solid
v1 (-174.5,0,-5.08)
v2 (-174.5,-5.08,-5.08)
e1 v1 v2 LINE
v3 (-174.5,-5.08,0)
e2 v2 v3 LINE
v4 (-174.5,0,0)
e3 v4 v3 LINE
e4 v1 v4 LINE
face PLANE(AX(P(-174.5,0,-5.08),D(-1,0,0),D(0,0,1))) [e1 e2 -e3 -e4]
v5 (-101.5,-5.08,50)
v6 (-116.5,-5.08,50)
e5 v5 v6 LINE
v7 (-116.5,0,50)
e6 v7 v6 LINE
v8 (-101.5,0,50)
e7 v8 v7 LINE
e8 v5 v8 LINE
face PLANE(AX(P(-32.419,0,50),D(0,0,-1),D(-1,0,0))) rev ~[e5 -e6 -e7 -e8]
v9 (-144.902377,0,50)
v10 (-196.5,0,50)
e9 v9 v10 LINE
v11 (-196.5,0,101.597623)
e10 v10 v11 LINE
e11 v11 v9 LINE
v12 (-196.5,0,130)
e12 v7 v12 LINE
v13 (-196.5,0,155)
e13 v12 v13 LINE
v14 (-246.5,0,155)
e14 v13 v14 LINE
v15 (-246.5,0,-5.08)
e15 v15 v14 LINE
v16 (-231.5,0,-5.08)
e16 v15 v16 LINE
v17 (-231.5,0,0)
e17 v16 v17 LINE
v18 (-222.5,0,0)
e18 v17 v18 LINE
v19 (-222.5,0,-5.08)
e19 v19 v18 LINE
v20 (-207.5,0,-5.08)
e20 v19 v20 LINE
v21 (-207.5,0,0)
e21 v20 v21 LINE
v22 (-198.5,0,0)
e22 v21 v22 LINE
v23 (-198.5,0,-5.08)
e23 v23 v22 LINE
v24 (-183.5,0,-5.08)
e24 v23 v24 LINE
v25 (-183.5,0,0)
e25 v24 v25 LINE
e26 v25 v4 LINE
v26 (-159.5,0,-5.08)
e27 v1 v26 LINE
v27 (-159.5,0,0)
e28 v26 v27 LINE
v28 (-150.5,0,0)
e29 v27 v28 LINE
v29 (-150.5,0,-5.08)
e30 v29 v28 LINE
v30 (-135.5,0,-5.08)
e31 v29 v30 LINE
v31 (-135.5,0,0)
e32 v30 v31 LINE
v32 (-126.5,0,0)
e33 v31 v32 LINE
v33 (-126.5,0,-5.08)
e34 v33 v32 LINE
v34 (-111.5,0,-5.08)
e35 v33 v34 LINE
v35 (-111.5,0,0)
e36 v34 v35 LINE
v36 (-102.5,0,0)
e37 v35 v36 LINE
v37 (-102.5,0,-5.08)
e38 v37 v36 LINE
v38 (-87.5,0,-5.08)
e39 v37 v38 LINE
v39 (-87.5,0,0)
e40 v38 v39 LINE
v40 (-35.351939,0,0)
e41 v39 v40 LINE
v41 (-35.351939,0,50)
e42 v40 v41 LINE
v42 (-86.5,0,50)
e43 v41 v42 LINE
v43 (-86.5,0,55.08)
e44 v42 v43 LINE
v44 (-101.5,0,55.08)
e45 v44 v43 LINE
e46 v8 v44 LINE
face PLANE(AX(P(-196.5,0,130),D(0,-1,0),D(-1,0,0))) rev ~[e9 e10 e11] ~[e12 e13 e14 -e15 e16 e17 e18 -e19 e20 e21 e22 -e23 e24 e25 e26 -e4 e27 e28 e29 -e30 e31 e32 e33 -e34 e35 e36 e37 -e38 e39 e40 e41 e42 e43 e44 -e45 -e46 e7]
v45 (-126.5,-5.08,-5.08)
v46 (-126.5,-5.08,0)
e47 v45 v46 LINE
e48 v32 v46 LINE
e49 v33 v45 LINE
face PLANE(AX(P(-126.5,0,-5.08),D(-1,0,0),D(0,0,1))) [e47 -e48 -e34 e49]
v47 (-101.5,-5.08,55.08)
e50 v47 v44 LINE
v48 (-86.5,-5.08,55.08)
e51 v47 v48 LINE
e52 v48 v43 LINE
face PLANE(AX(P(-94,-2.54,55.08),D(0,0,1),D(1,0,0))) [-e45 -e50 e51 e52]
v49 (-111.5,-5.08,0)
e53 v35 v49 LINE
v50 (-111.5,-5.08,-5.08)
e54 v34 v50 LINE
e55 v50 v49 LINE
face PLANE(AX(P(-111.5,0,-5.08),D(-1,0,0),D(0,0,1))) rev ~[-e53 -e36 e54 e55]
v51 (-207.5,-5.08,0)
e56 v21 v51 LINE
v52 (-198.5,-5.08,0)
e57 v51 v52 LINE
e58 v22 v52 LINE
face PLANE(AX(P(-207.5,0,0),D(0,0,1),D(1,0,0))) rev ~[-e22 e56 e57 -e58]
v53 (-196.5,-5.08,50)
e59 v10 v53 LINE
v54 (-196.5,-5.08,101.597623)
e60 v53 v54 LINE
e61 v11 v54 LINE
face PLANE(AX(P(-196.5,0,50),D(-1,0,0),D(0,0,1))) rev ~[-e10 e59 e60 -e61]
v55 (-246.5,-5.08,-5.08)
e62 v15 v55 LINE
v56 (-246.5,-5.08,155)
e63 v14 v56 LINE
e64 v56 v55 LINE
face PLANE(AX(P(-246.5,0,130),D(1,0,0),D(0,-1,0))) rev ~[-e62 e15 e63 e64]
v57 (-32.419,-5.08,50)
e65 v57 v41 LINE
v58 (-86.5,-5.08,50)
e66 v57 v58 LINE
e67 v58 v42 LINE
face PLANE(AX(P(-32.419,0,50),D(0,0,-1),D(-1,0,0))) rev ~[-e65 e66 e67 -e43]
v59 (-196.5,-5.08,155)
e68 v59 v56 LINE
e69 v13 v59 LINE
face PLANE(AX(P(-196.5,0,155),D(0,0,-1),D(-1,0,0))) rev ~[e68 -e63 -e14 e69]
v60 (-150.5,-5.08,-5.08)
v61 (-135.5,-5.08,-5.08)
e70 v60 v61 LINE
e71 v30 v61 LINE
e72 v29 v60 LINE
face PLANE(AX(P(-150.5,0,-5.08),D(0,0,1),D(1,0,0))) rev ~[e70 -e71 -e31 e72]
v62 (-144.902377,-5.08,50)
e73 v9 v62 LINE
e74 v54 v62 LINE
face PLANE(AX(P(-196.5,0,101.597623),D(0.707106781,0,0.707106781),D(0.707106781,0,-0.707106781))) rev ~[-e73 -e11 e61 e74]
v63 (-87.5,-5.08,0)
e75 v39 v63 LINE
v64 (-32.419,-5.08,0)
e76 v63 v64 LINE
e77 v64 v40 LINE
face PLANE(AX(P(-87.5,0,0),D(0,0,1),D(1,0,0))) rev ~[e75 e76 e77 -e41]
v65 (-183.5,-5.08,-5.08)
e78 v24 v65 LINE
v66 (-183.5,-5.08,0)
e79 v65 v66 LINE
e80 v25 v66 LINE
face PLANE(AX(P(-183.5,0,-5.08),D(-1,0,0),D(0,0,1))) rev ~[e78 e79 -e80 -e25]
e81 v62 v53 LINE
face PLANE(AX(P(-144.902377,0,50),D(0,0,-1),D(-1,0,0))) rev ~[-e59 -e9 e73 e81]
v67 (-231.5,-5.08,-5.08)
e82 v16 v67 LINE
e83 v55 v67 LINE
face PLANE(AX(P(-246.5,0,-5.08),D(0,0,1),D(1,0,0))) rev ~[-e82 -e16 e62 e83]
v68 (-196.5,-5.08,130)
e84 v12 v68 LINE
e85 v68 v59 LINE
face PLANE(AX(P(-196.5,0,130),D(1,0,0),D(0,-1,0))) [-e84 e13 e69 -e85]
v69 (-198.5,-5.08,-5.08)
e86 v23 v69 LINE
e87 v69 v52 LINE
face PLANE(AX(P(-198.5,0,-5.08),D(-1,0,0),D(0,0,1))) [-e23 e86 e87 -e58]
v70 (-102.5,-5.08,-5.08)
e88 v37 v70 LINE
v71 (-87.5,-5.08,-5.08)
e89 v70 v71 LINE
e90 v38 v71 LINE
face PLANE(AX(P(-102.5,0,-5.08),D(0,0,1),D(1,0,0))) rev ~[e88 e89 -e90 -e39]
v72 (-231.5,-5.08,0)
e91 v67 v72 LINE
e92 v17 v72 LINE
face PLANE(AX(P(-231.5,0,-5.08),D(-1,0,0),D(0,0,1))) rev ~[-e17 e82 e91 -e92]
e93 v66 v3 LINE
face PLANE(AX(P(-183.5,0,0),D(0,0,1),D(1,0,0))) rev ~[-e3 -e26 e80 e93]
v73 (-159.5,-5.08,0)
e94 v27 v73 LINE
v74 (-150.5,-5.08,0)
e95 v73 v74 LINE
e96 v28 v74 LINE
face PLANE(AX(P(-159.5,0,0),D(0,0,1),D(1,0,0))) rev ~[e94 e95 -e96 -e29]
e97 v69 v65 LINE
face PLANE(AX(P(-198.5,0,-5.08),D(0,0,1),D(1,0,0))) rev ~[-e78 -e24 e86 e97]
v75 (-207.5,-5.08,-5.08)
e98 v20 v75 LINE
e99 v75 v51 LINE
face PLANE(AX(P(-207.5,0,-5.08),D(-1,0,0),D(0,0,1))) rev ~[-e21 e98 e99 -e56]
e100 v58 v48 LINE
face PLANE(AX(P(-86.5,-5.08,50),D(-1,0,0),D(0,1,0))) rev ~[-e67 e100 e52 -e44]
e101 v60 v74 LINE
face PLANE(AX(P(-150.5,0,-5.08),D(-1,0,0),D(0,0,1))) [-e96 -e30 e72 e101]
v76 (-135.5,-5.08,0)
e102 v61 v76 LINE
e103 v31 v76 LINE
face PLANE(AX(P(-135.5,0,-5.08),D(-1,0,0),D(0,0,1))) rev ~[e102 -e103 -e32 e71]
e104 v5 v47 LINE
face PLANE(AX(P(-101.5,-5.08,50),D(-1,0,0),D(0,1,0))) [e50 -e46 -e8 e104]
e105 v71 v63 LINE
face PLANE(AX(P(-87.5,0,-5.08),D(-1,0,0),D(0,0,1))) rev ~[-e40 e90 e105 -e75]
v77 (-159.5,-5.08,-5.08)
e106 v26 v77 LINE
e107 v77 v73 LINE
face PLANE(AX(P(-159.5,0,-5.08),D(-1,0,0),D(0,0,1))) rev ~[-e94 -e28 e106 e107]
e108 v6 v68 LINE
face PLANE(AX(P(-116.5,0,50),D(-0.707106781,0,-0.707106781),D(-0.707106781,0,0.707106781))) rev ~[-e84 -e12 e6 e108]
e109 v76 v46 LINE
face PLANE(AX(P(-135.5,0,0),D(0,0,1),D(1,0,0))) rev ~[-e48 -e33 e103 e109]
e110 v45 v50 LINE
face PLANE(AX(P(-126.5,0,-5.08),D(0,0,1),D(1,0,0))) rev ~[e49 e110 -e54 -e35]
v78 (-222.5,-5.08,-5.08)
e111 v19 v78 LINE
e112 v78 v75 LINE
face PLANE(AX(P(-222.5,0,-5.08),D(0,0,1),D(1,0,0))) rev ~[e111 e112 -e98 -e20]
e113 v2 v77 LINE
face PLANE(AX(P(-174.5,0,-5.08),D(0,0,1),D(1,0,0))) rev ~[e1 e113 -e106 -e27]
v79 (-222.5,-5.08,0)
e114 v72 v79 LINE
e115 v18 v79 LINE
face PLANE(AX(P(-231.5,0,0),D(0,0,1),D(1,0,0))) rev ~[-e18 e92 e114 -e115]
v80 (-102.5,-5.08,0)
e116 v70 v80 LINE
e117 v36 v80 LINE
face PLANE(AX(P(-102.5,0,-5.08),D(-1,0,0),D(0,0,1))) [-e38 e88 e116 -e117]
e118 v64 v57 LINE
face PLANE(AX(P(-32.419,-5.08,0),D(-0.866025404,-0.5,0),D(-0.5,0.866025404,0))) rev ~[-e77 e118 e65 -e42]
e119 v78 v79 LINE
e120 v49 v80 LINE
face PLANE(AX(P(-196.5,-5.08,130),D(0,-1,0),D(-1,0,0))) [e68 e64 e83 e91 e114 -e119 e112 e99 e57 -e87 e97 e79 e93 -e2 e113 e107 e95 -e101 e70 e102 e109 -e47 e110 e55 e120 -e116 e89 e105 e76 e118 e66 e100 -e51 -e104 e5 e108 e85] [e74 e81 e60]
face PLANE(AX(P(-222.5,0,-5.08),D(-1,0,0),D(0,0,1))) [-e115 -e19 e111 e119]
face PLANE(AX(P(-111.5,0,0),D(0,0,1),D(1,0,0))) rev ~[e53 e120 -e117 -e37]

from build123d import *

# Parameters (mm, degrees)
F0_W     = 15
F0_H     = 5.08
F1_DEPTH = 5.08
F2_DEPTH = 25
F4_DEPTH = 58
F5_W     = 15
F5_H     = 5.08
F6_DEPTH = 5.08


# Not quite as in the source:
# - a feature names something its author has since deleted; it is built from what else it names


with BuildPart() as f1:
    # F0 (on Front) → F1 (new body)
    with BuildSketch(Plane.XZ):
        Polygon((-87.5, 0), (-32.419, 0), (-32.419, 50), (-116.5, 50), (-144.9023774395, 50), (-196.5, 50), (-196.5, 101.5976225605), (-196.5, 130), (-246.5, 130), (-246.5, 0), (-231.5, 0), (-222.5, 0), (-207.5, 0), (-198.5, 0), (-183.5, 0), (-174.5, 0), (-159.5, 0), (-150.5, 0), (-135.5, 0), (-126.5, 0), (-111.5, 0), (-102.5, 0), align=None)
        with Locations((-95, -2.54)):
            Rectangle(F0_W, F0_H)
        Polygon((-144.9023774395, 50), (-116.5, 50), (-196.5, 130), (-196.5, 101.5976225605), align=None)
        with Locations((-119, -2.54)):
            Rectangle(F0_W, F0_H)
        with Locations((-143, -2.54)):
            Rectangle(F0_W, F0_H)
        with Locations((-239, -2.54)):
            Rectangle(F0_W, F0_H)
        with Locations((-167, -2.54)):
            Rectangle(F0_W, F0_H)
        with Locations((-215, -2.54)):
            Rectangle(F0_W, F0_H)
        with Locations((-191, -2.54)):
            Rectangle(F0_W, F0_H)
    extrude(amount=F1_DEPTH)

    # F2 (add): a face of the model
    f2_faces = [f1.faces().sort_by_distance(p)[0] for p in [
        (-221.5, -2.54, 130),
    ]]
    extrude(f2_faces, amount=F2_DEPTH)

    # F3 (on face) → F4 (cut)
    with BuildSketch(Plane(origin=(0, 0, 0), x_dir=(1, 0, 0), z_dir=(0, 0, -1))):
        Polygon((-32.419, 0), (-32.419, 5.08), (-35.3519393675, 0), align=None)
    extrude(amount=-F4_DEPTH, mode=Mode.SUBTRACT)

    # F5 (on face) → F6 (join)
    with BuildSketch(Plane.XY.offset(50)):
        with Locations((-94, -2.54)):
            Rectangle(F5_W, F5_H)
    extrude(amount=F6_DEPTH)


solid = f1.part
